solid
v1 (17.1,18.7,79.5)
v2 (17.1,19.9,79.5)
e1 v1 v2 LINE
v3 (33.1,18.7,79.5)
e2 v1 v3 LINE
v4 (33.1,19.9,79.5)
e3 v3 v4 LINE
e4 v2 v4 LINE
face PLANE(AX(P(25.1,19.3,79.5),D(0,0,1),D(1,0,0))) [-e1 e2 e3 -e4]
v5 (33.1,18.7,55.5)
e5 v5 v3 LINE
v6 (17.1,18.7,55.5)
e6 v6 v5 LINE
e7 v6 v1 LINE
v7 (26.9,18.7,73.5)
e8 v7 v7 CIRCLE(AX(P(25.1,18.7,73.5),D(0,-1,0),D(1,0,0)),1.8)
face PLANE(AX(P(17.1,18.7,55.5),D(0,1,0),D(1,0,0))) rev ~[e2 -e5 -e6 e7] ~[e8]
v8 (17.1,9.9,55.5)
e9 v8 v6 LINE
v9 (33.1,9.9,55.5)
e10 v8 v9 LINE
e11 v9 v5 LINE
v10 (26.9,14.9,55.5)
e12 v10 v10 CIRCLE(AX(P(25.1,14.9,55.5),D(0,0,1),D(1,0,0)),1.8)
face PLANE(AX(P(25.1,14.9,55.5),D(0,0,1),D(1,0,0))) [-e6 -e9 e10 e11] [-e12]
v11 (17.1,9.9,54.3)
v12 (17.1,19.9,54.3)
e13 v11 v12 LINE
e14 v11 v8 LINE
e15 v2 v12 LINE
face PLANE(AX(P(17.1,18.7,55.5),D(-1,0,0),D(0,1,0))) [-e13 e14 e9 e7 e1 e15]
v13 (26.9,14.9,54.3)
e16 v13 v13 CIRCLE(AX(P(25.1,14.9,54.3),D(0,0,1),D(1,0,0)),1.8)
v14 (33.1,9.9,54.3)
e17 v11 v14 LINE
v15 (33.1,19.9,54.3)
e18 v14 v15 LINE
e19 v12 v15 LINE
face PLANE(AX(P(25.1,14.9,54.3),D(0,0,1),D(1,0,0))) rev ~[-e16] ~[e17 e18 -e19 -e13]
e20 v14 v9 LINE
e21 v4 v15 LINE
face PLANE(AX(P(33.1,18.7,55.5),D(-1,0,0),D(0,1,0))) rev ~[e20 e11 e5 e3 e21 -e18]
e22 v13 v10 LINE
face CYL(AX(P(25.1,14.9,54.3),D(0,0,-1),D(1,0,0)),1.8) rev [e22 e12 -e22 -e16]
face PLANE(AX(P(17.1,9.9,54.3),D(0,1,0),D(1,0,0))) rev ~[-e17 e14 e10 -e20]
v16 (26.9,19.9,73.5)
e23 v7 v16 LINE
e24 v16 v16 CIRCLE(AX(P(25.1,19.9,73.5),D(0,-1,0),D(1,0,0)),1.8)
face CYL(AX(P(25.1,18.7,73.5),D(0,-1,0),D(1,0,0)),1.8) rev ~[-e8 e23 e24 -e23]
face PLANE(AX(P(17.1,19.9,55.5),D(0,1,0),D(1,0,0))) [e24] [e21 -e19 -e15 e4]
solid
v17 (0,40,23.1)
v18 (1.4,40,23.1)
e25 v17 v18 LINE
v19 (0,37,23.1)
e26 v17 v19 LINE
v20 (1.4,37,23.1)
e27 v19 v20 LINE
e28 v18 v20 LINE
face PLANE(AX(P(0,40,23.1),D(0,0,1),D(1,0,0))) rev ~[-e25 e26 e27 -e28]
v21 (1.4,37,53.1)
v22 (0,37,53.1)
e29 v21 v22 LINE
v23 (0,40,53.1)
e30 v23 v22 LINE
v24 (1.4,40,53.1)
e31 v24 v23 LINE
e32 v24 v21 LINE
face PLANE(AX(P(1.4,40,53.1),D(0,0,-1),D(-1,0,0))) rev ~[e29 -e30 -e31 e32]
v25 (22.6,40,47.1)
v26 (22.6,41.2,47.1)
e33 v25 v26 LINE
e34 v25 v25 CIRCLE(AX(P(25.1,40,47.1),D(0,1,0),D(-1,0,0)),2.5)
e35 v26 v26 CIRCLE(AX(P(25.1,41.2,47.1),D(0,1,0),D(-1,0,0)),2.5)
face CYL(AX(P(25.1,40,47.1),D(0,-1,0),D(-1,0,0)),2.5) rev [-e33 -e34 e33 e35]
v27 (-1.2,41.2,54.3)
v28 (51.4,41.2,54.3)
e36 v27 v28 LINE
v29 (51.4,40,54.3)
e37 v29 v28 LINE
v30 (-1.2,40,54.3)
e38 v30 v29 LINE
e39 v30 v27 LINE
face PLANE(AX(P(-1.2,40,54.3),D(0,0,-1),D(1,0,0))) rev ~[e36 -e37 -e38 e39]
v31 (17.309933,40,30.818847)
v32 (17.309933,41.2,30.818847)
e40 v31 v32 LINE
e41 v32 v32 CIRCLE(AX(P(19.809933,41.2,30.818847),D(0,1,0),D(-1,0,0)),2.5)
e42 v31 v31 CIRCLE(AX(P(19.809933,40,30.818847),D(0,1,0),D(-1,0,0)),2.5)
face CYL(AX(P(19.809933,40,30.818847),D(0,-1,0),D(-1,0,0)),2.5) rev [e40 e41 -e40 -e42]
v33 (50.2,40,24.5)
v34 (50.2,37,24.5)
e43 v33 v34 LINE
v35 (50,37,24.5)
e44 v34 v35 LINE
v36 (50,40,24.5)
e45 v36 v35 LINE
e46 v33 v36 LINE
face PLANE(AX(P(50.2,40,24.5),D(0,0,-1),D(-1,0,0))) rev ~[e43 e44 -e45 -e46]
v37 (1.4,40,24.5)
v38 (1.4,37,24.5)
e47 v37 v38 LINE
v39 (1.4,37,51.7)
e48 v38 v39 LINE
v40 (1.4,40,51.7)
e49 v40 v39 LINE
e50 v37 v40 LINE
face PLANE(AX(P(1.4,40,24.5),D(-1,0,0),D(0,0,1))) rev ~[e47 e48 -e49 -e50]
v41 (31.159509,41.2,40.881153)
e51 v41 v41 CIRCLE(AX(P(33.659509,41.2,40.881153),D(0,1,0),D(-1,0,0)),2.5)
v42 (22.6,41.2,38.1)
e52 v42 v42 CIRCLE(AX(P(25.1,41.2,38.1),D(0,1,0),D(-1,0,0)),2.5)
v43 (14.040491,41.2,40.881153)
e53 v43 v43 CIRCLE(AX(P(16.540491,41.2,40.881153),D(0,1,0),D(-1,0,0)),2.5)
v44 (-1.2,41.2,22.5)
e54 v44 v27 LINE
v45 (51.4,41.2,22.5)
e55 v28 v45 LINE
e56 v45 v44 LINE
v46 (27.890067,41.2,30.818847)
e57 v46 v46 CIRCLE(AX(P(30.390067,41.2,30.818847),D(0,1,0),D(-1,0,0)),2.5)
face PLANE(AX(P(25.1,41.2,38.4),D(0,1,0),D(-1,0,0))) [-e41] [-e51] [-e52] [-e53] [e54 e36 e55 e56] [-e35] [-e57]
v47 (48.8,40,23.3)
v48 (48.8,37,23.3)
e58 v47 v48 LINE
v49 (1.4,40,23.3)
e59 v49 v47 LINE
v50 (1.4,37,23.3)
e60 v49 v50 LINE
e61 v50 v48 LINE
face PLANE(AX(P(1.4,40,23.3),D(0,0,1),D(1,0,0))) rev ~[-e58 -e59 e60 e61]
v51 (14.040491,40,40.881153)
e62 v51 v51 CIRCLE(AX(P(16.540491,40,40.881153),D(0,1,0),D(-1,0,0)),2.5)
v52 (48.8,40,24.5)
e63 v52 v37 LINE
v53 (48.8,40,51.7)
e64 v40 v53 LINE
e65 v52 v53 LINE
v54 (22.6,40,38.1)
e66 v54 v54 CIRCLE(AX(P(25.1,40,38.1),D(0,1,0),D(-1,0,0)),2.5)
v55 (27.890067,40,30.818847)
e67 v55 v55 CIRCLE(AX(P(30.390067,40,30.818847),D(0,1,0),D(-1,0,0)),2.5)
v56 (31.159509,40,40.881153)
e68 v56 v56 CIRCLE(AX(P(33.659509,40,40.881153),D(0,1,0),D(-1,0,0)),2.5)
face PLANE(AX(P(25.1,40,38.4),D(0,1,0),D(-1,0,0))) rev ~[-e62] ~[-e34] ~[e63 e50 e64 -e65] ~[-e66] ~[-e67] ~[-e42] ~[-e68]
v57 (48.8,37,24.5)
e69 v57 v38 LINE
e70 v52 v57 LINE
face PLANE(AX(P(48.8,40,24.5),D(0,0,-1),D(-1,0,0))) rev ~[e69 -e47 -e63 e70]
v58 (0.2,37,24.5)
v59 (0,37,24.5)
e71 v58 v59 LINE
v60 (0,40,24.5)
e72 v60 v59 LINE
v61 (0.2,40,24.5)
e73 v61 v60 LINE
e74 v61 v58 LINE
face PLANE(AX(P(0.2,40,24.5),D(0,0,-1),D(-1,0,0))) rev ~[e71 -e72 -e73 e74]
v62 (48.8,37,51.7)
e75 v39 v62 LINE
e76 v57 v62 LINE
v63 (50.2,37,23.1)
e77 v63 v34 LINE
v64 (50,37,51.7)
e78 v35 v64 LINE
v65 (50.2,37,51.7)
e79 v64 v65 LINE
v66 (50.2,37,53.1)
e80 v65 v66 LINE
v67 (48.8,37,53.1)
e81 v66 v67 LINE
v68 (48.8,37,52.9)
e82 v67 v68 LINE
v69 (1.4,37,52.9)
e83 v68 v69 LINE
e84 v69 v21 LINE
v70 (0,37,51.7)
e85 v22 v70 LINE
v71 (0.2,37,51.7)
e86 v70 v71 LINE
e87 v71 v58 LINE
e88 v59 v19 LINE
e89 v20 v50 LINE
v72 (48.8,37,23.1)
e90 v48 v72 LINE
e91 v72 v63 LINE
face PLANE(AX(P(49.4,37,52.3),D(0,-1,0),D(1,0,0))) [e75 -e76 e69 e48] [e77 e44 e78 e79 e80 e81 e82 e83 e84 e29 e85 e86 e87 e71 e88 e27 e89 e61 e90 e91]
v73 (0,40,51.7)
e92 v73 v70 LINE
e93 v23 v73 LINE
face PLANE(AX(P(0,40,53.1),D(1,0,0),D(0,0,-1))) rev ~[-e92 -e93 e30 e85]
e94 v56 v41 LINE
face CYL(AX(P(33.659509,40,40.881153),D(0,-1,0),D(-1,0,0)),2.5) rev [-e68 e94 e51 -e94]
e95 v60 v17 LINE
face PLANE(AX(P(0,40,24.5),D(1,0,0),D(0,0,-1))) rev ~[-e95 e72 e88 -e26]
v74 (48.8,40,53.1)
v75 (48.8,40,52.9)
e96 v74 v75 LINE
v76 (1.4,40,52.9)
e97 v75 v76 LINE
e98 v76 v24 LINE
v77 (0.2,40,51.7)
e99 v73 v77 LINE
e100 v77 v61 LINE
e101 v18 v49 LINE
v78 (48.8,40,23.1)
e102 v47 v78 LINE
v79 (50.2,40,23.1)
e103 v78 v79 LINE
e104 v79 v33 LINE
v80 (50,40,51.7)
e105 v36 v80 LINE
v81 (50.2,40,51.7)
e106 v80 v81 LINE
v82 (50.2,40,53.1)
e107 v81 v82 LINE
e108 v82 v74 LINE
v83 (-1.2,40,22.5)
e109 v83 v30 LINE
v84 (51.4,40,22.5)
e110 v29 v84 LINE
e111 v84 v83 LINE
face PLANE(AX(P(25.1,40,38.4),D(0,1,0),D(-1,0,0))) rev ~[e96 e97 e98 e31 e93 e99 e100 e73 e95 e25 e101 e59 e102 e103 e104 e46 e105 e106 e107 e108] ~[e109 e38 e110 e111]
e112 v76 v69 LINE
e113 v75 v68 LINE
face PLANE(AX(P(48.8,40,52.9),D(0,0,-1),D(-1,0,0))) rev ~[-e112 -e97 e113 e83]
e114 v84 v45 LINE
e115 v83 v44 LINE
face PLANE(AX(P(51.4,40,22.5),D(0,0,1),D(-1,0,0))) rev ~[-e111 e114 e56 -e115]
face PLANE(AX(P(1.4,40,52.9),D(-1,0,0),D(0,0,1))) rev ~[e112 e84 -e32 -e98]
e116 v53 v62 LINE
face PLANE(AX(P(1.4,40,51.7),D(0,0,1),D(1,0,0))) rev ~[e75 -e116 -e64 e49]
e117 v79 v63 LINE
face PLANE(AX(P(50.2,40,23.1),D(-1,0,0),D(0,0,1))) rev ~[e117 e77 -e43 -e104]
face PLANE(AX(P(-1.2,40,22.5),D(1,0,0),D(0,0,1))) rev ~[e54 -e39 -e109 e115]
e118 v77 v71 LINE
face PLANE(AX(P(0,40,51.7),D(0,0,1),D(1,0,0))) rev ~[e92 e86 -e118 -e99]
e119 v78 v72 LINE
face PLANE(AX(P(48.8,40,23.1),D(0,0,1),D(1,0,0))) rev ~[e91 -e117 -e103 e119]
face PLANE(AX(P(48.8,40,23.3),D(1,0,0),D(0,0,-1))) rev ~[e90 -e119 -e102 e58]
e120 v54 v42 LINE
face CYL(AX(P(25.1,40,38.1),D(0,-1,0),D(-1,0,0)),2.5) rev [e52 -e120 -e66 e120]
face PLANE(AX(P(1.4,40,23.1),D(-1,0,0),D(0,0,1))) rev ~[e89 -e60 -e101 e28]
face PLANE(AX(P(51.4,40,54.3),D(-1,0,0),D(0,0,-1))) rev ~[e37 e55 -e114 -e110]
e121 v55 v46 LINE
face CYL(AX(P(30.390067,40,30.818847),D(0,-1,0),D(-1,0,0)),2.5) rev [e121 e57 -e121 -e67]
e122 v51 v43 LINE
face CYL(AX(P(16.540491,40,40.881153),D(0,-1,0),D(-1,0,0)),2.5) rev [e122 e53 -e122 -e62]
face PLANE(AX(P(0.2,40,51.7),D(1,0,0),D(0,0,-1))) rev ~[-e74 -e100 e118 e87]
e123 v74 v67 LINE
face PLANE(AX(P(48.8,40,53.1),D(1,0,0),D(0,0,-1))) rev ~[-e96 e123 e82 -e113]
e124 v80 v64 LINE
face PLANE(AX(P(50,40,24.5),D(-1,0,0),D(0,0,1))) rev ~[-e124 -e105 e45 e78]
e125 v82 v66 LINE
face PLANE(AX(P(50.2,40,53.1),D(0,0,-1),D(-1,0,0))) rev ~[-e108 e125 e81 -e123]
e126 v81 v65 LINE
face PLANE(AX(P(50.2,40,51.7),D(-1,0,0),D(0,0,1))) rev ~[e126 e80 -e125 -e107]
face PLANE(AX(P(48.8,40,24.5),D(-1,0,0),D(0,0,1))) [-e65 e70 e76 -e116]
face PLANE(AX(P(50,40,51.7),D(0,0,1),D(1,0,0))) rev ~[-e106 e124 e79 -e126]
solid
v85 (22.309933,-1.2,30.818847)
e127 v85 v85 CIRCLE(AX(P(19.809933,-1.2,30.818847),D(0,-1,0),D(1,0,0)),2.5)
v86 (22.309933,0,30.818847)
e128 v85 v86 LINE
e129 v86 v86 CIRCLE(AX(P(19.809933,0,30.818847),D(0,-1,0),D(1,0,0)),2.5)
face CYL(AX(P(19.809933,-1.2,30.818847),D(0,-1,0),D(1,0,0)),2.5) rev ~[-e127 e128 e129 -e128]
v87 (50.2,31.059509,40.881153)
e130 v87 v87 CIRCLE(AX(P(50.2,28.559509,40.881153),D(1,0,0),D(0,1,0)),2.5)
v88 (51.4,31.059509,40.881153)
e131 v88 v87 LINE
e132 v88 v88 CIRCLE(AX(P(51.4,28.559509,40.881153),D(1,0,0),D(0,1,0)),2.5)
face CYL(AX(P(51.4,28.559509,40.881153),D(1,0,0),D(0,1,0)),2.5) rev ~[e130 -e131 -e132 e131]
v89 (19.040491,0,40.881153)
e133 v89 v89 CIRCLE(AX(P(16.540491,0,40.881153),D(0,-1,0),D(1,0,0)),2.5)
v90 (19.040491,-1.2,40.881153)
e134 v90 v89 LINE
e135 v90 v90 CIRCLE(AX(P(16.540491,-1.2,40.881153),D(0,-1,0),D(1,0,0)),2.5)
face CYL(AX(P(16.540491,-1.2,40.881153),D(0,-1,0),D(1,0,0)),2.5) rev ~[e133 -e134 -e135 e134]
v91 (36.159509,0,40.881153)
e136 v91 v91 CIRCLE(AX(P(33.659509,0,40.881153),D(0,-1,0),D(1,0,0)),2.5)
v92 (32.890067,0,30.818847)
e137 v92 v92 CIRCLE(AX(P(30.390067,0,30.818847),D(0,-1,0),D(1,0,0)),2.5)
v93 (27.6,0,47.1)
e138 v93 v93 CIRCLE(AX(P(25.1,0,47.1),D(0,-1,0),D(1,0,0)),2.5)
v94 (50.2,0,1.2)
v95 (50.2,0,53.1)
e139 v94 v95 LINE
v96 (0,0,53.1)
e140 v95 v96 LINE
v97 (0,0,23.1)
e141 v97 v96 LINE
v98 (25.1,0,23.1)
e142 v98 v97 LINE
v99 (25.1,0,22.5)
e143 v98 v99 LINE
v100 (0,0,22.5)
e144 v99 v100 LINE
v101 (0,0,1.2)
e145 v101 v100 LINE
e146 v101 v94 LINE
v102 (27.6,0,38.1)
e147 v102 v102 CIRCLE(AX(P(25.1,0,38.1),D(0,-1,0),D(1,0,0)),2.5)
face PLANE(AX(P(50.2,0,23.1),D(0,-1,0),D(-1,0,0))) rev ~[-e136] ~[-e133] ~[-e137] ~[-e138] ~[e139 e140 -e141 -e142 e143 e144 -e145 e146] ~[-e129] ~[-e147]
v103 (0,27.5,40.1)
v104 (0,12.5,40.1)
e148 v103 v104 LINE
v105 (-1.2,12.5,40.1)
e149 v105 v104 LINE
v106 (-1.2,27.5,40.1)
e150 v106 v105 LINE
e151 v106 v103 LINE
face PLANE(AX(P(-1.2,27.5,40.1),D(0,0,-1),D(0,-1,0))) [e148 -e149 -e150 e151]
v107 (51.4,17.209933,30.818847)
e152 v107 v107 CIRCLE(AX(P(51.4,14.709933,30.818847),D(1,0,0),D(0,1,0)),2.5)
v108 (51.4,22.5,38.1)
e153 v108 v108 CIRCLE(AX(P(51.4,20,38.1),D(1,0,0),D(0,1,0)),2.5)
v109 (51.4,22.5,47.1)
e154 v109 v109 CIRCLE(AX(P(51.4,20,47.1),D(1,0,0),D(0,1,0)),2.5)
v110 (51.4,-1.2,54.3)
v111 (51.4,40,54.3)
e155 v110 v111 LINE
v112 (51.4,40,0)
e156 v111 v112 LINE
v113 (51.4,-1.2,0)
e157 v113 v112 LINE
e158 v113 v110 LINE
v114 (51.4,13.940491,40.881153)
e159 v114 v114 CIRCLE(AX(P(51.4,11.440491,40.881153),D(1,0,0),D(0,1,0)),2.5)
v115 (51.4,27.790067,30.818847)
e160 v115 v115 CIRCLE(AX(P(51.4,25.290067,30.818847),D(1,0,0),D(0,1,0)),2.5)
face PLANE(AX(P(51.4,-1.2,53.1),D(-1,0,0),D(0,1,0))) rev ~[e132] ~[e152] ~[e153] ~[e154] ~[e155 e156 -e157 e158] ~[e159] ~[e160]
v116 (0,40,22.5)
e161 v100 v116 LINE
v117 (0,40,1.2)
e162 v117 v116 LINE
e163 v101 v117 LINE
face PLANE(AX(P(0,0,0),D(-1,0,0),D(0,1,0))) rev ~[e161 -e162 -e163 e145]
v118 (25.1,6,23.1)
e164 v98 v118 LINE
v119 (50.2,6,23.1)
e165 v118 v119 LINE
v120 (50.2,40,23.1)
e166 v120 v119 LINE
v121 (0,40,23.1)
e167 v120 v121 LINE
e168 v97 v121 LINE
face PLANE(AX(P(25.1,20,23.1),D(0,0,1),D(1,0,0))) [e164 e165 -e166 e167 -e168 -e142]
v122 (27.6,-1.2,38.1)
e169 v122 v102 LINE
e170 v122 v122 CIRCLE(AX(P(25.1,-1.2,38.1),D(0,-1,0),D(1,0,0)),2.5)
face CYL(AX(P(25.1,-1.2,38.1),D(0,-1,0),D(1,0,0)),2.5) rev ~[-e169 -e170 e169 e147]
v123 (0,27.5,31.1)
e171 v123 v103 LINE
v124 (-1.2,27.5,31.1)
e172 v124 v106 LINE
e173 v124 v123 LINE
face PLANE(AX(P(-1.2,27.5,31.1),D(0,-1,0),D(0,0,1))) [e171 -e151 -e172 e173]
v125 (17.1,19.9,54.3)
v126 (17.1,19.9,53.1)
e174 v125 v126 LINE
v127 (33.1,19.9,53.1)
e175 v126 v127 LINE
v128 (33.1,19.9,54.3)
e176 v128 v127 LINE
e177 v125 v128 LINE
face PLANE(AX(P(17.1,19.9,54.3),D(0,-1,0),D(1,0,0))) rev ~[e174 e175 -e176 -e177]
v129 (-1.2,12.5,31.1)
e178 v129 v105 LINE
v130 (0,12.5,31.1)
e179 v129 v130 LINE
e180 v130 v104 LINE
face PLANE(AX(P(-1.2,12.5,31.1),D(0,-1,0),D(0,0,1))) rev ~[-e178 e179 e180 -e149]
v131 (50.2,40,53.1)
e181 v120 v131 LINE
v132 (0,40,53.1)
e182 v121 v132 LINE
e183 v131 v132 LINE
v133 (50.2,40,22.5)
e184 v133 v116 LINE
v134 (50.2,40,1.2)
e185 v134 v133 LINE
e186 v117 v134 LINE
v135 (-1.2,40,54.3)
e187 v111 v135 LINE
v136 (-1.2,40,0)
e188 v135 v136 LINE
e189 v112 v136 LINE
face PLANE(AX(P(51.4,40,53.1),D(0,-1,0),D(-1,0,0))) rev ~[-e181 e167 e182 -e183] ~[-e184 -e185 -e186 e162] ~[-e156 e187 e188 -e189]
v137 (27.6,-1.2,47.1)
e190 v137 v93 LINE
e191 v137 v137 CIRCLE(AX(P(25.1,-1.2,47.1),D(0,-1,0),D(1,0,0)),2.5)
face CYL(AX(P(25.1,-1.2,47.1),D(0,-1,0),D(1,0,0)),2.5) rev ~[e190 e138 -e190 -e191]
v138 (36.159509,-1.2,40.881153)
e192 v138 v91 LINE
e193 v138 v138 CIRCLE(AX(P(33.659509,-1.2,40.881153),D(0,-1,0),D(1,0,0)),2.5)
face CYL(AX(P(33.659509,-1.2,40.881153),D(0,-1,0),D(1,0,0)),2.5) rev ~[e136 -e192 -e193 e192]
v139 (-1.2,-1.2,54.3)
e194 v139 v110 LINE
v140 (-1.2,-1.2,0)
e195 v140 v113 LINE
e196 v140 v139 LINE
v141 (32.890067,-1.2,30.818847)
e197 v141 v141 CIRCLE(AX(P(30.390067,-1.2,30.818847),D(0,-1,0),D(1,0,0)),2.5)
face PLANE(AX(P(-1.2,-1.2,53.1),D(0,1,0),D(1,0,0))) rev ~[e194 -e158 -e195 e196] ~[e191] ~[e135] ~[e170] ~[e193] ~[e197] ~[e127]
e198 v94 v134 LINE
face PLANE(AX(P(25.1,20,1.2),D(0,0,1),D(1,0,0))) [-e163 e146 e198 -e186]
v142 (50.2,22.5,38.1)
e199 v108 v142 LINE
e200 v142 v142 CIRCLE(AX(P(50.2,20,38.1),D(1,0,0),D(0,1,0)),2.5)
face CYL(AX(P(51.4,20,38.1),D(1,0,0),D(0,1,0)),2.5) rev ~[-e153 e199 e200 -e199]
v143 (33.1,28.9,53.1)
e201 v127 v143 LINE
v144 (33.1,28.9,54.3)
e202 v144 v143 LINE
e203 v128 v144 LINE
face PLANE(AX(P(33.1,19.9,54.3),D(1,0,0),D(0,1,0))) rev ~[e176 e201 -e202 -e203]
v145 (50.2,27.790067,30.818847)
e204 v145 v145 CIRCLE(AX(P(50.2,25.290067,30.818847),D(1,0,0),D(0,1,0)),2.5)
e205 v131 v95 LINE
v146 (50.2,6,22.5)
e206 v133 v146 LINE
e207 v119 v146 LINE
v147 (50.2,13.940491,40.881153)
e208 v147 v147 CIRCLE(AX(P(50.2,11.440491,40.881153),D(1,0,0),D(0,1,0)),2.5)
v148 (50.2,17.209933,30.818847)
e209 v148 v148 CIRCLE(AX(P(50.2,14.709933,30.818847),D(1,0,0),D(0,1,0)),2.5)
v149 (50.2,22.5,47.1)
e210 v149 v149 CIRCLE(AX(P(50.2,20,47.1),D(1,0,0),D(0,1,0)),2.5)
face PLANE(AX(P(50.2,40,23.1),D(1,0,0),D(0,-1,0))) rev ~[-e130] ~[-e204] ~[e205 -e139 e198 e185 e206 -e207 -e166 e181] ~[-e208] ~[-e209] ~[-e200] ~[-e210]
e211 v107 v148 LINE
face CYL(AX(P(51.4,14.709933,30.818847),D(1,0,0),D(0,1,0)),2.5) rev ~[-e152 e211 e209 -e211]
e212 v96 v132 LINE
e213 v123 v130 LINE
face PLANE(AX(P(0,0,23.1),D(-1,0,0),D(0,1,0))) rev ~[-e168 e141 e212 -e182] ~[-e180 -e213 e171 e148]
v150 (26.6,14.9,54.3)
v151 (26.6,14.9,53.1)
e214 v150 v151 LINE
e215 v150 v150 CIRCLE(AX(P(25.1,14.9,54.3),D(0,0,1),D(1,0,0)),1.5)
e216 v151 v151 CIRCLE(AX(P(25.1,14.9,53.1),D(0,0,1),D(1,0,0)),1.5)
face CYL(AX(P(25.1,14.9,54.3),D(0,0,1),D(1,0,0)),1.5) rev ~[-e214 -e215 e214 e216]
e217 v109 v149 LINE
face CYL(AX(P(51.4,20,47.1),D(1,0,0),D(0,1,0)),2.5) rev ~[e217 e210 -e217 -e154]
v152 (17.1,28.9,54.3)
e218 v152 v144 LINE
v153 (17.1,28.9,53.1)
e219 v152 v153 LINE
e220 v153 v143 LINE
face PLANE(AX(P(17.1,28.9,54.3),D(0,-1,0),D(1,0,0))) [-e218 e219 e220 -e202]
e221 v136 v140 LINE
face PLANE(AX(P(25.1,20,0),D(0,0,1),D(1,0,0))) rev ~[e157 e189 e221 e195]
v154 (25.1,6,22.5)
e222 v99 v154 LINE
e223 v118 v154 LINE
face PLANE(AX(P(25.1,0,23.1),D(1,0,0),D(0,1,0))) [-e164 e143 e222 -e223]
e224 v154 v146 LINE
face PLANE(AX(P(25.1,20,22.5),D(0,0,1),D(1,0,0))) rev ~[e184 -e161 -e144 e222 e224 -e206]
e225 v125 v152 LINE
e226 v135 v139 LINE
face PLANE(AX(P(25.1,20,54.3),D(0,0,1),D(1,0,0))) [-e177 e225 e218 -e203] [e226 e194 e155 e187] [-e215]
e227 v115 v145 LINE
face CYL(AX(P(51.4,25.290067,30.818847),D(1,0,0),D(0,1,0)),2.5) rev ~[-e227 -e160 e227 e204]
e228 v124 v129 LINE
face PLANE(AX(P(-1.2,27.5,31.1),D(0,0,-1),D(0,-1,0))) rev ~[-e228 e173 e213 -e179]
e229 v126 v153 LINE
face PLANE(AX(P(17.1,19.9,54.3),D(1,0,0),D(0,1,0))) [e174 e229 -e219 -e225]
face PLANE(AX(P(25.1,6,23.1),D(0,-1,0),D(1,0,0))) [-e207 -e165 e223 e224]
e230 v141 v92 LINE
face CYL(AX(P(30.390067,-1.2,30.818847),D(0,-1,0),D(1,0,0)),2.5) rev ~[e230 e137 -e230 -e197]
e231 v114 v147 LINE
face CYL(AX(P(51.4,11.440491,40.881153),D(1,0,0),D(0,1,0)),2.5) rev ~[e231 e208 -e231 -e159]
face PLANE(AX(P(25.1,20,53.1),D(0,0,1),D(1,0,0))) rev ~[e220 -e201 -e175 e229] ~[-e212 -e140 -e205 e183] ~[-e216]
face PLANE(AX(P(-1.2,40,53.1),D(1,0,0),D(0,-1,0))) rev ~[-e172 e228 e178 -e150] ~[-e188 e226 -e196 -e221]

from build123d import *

# Parameters (mm, degrees)
F0_W      = 50.2
F0_H      = 40
F1_DEPTH  = 1.2
F2_DEPTH  = 22.5
F3_W      = 50.2
F3_H      = 40
F4_DEPTH  = 0.6
F5_W      = 25.1
F5_H      = 6
F6_DEPTH  = 0.6
F8_DEPTH  = 30
F9_W      = 50.2
F9_H      = 40
F10_DEPTH = 1.2
F11_W     = 16
F11_H     = 9
F11_R     = 1.5
F12_DEPTH = 1.2
F13_W     = 15
F13_H     = 9
F14_DEPTH = 1.2
F15_R     = 2.5
F16_DEPTH = 1.2
F17_R     = 2.5
F18_DEPTH = 1.2
F19_W     = 16
F19_H     = 10
F19_R     = 1.8
F20_DEPTH = 1.2
F21_W     = 16
F21_H     = 1.2
F22_DEPTH = 24
F23_R     = 1.8
F24_DEPTH = 1.2
F25_W     = 50.2
F25_H     = 30
F25_R     = 2.5
F26_DEPTH = 1.2
F27_W     = 1.2
F27_H     = 1.2
F27_W_2   = 47.4
F27_H_2   = 27.2
F28_DEPTH = 3


with BuildPart() as f1:
    # F0 (on Top) → F1 (new body)
    with BuildSketch(Plane.XY):
        with Locations((25.1, 20)):
            Rectangle(F0_W, F0_H)
    extrude(amount=F1_DEPTH)

    # F0 (on Top) → F2 (join)
    with BuildSketch(Plane.XY):
        Polygon((50.2, 0), (0, 0), (0, 40), (-1.2, 40), (-1.2, -1.2), (51.4, -1.2), (51.4, 40), (50.2, 40), align=None)
    extrude(amount=F2_DEPTH)

    # F3 (on face) → F4 (join)
    with BuildSketch(Plane.XY.offset(22.5)):
        with Locations((25.1, 20)):
            Rectangle(F3_W, F3_H)
        Polygon((50.2, 0), (0, 0), (0, 40), (-1.2, 40), (-1.2, -1.2), (51.4, -1.2), (51.4, 40), (50.2, 40), align=None)
    extrude(amount=F4_DEPTH)

    # F5 (on face) → F6 (cut, through all)
    with BuildSketch(Plane.XY.offset(23.1)):
        with Locations((37.65, 3)):
            Rectangle(F5_W, F5_H)
    extrude(amount=-F6_DEPTH, mode=Mode.SUBTRACT)

    # F7 (on face) → F8 (join)
    with BuildSketch(Plane.XY.offset(23.1)):
        Polygon((-1.2, 40), (-1.2, -1.2), (51.4, -1.2), (51.4, 40), (50.2, 40), (50.2, 6), (50.2, 0), (25.1, 0), (0, 0), (0, 40), align=None)
    extrude(amount=F8_DEPTH)

    # F9 (on face) → F10 (join)
    with BuildSketch(Plane.XY.offset(53.1)):
        with Locations((25.1, 20)):
            Rectangle(F9_W, F9_H)
        Polygon((-1.2, -1.2), (51.4, -1.2), (51.4, 40), (50.2, 40), (50.2, 0), (0, 0), (0, 40), (-1.2, 40), align=None)
    extrude(amount=F10_DEPTH)

    # F11 (on face) → F12 (cut, through all)
    with BuildSketch(Plane.XY.offset(54.3)):
        with Locations((25.1, 24.4)):
            Rectangle(F11_W, F11_H)
        with Locations((25.1, 14.9)):
            Circle(F11_R)
    extrude(amount=-F12_DEPTH, mode=Mode.SUBTRACT)

    # F13 (on face) → F14 (cut, through all)
    with BuildSketch(Plane(origin=(-1.2, 0, 0), x_dir=(0, -1, 0), z_dir=(-1, 0, 0))):
        with Locations((-20, 35.6)):
            Rectangle(F13_W, F13_H)
    extrude(amount=-F14_DEPTH, mode=Mode.SUBTRACT)

    # F15 (on face) → F16 (cut, through all)
    with BuildSketch(Plane.YZ.offset(51.4)):
        with Locations((28.5595086467, 40.8811529494)):
            Circle(F15_R)
        with Locations((20, 47.1)):
            Circle(F15_R)
        with Locations((20, 38.1)):
            Circle(F15_R)
        with Locations((11.4404913533, 40.8811529494)):
            Circle(F15_R)
        with Locations((14.7099327294, 30.8188470506)):
            Circle(F15_R)
        with Locations((25.2900672706, 30.8188470506)):
            Circle(F15_R)
    extrude(amount=-F16_DEPTH, mode=Mode.SUBTRACT)

    # F17 (on face) → F18 (cut, through all)
    with BuildSketch(Plane.XZ.offset(1.2)):
        with Locations((25.1, 47.1)):
            Circle(F17_R)
        with Locations((33.6595086467, 40.8811529494)):
            Circle(F17_R)
        with Locations((30.3900672706, 30.8188470506)):
            Circle(F17_R)
        with Locations((25.1, 38.1)):
            Circle(F17_R)
        with Locations((16.5404913533, 40.8811529494)):
            Circle(F17_R)
        with Locations((19.8099327294, 30.8188470506)):
            Circle(F17_R)
    extrude(amount=-F18_DEPTH, mode=Mode.SUBTRACT)


with BuildPart() as f20:
    # F19 (on face) → F20 (new body)
    with BuildSketch(Plane.XY.offset(54.3)):
        with Locations((25.1, 14.9)):
            Rectangle(F19_W, F19_H)
        with Locations((25.1, 14.9)):
            Circle(F19_R, mode=Mode.SUBTRACT)
    extrude(amount=F20_DEPTH)

    # F21 (on face) → F22 (join)
    with BuildSketch(Plane.XY.offset(55.5)):
        with Locations((25.1, 19.3)):
            Rectangle(F21_W, F21_H)
    extrude(amount=F22_DEPTH)

    # F23 (on face) → F24 (cut, through all)
    with BuildSketch(Plane.XZ.offset(-18.7)):
        with Locations((25.1, 73.5)):
            Circle(F23_R)
    extrude(amount=-F24_DEPTH, mode=Mode.SUBTRACT)


with BuildPart() as f26:
    # F25 (on face) → F26 (new body)
    with BuildSketch(Plane(origin=(0, 40, 0), x_dir=(-1, 0, 0), z_dir=(0, 1, 0))):
        Polygon((1.2, 22.5), (1.2, 54.3), (-51.4, 54.3), (-51.4, 22.5), (-50.2, 22.5), (0, 22.5), align=None)
        with Locations((-25.1, 38.1)):
            Rectangle(F25_W, F25_H, mode=Mode.SUBTRACT)
        with Locations((-25.1, 38.1)):
            Rectangle(F25_W, F25_H)
        with Locations((-30.3900672706, 30.8188470506)):
            Circle(F25_R, mode=Mode.SUBTRACT)
        with Locations((-25.1, 38.1)):
            Circle(F25_R, mode=Mode.SUBTRACT)
        with Locations((-33.6595086467, 40.8811529494)):
            Circle(F25_R, mode=Mode.SUBTRACT)
        with Locations((-25.1, 47.1)):
            Circle(F25_R, mode=Mode.SUBTRACT)
        with Locations((-19.8099327294, 30.8188470506)):
            Circle(F25_R, mode=Mode.SUBTRACT)
        with Locations((-16.5404913533, 40.8811529494)):
            Circle(F25_R, mode=Mode.SUBTRACT)
    extrude(amount=F26_DEPTH)

    # F27 (on face) → F28 (join)
    with BuildSketch(Plane.XZ.offset(-40)):
        with Locations((49.4, 52.3)):
            Rectangle(F27_W, F27_H)
        with Locations((25.1, 52.3)):
            Rectangle(F27_W_2, F27_H)
        with Locations((0.8, 52.3)):
            Rectangle(F27_W, F27_H)
        Polygon((1.4, 52.9), (1.4, 53.1), (0, 53.1), (0, 51.7), (0.2, 51.7), (0.2, 52.9), align=None)
        with Locations((0.8, 38.1)):
            Rectangle(F27_W, F27_H_2)
        with Locations((0.8, 23.9)):
            Rectangle(F27_W, F27_H)
        Polygon((0, 23.1), (1.4, 23.1), (1.4, 23.3), (0.2, 23.3), (0.2, 24.5), (0, 24.5), align=None)
        with Locations((25.1, 23.9)):
            Rectangle(F27_W_2, F27_H)
        with Locations((49.4, 23.9)):
            Rectangle(F27_W, F27_H)
        Polygon((50.2, 23.1), (50.2, 24.5), (50, 24.5), (50, 23.3), (48.8, 23.3), (48.8, 23.1), align=None)
        with Locations((49.4, 38.1)):
            Rectangle(F27_W, F27_H_2)
        Polygon((50.2, 51.7), (50.2, 53.1), (48.8, 53.1), (48.8, 52.9), (50, 52.9), (50, 51.7), align=None)
    extrude(amount=F28_DEPTH)


solid = Compound([f1.part, f20.part, f26.part])
